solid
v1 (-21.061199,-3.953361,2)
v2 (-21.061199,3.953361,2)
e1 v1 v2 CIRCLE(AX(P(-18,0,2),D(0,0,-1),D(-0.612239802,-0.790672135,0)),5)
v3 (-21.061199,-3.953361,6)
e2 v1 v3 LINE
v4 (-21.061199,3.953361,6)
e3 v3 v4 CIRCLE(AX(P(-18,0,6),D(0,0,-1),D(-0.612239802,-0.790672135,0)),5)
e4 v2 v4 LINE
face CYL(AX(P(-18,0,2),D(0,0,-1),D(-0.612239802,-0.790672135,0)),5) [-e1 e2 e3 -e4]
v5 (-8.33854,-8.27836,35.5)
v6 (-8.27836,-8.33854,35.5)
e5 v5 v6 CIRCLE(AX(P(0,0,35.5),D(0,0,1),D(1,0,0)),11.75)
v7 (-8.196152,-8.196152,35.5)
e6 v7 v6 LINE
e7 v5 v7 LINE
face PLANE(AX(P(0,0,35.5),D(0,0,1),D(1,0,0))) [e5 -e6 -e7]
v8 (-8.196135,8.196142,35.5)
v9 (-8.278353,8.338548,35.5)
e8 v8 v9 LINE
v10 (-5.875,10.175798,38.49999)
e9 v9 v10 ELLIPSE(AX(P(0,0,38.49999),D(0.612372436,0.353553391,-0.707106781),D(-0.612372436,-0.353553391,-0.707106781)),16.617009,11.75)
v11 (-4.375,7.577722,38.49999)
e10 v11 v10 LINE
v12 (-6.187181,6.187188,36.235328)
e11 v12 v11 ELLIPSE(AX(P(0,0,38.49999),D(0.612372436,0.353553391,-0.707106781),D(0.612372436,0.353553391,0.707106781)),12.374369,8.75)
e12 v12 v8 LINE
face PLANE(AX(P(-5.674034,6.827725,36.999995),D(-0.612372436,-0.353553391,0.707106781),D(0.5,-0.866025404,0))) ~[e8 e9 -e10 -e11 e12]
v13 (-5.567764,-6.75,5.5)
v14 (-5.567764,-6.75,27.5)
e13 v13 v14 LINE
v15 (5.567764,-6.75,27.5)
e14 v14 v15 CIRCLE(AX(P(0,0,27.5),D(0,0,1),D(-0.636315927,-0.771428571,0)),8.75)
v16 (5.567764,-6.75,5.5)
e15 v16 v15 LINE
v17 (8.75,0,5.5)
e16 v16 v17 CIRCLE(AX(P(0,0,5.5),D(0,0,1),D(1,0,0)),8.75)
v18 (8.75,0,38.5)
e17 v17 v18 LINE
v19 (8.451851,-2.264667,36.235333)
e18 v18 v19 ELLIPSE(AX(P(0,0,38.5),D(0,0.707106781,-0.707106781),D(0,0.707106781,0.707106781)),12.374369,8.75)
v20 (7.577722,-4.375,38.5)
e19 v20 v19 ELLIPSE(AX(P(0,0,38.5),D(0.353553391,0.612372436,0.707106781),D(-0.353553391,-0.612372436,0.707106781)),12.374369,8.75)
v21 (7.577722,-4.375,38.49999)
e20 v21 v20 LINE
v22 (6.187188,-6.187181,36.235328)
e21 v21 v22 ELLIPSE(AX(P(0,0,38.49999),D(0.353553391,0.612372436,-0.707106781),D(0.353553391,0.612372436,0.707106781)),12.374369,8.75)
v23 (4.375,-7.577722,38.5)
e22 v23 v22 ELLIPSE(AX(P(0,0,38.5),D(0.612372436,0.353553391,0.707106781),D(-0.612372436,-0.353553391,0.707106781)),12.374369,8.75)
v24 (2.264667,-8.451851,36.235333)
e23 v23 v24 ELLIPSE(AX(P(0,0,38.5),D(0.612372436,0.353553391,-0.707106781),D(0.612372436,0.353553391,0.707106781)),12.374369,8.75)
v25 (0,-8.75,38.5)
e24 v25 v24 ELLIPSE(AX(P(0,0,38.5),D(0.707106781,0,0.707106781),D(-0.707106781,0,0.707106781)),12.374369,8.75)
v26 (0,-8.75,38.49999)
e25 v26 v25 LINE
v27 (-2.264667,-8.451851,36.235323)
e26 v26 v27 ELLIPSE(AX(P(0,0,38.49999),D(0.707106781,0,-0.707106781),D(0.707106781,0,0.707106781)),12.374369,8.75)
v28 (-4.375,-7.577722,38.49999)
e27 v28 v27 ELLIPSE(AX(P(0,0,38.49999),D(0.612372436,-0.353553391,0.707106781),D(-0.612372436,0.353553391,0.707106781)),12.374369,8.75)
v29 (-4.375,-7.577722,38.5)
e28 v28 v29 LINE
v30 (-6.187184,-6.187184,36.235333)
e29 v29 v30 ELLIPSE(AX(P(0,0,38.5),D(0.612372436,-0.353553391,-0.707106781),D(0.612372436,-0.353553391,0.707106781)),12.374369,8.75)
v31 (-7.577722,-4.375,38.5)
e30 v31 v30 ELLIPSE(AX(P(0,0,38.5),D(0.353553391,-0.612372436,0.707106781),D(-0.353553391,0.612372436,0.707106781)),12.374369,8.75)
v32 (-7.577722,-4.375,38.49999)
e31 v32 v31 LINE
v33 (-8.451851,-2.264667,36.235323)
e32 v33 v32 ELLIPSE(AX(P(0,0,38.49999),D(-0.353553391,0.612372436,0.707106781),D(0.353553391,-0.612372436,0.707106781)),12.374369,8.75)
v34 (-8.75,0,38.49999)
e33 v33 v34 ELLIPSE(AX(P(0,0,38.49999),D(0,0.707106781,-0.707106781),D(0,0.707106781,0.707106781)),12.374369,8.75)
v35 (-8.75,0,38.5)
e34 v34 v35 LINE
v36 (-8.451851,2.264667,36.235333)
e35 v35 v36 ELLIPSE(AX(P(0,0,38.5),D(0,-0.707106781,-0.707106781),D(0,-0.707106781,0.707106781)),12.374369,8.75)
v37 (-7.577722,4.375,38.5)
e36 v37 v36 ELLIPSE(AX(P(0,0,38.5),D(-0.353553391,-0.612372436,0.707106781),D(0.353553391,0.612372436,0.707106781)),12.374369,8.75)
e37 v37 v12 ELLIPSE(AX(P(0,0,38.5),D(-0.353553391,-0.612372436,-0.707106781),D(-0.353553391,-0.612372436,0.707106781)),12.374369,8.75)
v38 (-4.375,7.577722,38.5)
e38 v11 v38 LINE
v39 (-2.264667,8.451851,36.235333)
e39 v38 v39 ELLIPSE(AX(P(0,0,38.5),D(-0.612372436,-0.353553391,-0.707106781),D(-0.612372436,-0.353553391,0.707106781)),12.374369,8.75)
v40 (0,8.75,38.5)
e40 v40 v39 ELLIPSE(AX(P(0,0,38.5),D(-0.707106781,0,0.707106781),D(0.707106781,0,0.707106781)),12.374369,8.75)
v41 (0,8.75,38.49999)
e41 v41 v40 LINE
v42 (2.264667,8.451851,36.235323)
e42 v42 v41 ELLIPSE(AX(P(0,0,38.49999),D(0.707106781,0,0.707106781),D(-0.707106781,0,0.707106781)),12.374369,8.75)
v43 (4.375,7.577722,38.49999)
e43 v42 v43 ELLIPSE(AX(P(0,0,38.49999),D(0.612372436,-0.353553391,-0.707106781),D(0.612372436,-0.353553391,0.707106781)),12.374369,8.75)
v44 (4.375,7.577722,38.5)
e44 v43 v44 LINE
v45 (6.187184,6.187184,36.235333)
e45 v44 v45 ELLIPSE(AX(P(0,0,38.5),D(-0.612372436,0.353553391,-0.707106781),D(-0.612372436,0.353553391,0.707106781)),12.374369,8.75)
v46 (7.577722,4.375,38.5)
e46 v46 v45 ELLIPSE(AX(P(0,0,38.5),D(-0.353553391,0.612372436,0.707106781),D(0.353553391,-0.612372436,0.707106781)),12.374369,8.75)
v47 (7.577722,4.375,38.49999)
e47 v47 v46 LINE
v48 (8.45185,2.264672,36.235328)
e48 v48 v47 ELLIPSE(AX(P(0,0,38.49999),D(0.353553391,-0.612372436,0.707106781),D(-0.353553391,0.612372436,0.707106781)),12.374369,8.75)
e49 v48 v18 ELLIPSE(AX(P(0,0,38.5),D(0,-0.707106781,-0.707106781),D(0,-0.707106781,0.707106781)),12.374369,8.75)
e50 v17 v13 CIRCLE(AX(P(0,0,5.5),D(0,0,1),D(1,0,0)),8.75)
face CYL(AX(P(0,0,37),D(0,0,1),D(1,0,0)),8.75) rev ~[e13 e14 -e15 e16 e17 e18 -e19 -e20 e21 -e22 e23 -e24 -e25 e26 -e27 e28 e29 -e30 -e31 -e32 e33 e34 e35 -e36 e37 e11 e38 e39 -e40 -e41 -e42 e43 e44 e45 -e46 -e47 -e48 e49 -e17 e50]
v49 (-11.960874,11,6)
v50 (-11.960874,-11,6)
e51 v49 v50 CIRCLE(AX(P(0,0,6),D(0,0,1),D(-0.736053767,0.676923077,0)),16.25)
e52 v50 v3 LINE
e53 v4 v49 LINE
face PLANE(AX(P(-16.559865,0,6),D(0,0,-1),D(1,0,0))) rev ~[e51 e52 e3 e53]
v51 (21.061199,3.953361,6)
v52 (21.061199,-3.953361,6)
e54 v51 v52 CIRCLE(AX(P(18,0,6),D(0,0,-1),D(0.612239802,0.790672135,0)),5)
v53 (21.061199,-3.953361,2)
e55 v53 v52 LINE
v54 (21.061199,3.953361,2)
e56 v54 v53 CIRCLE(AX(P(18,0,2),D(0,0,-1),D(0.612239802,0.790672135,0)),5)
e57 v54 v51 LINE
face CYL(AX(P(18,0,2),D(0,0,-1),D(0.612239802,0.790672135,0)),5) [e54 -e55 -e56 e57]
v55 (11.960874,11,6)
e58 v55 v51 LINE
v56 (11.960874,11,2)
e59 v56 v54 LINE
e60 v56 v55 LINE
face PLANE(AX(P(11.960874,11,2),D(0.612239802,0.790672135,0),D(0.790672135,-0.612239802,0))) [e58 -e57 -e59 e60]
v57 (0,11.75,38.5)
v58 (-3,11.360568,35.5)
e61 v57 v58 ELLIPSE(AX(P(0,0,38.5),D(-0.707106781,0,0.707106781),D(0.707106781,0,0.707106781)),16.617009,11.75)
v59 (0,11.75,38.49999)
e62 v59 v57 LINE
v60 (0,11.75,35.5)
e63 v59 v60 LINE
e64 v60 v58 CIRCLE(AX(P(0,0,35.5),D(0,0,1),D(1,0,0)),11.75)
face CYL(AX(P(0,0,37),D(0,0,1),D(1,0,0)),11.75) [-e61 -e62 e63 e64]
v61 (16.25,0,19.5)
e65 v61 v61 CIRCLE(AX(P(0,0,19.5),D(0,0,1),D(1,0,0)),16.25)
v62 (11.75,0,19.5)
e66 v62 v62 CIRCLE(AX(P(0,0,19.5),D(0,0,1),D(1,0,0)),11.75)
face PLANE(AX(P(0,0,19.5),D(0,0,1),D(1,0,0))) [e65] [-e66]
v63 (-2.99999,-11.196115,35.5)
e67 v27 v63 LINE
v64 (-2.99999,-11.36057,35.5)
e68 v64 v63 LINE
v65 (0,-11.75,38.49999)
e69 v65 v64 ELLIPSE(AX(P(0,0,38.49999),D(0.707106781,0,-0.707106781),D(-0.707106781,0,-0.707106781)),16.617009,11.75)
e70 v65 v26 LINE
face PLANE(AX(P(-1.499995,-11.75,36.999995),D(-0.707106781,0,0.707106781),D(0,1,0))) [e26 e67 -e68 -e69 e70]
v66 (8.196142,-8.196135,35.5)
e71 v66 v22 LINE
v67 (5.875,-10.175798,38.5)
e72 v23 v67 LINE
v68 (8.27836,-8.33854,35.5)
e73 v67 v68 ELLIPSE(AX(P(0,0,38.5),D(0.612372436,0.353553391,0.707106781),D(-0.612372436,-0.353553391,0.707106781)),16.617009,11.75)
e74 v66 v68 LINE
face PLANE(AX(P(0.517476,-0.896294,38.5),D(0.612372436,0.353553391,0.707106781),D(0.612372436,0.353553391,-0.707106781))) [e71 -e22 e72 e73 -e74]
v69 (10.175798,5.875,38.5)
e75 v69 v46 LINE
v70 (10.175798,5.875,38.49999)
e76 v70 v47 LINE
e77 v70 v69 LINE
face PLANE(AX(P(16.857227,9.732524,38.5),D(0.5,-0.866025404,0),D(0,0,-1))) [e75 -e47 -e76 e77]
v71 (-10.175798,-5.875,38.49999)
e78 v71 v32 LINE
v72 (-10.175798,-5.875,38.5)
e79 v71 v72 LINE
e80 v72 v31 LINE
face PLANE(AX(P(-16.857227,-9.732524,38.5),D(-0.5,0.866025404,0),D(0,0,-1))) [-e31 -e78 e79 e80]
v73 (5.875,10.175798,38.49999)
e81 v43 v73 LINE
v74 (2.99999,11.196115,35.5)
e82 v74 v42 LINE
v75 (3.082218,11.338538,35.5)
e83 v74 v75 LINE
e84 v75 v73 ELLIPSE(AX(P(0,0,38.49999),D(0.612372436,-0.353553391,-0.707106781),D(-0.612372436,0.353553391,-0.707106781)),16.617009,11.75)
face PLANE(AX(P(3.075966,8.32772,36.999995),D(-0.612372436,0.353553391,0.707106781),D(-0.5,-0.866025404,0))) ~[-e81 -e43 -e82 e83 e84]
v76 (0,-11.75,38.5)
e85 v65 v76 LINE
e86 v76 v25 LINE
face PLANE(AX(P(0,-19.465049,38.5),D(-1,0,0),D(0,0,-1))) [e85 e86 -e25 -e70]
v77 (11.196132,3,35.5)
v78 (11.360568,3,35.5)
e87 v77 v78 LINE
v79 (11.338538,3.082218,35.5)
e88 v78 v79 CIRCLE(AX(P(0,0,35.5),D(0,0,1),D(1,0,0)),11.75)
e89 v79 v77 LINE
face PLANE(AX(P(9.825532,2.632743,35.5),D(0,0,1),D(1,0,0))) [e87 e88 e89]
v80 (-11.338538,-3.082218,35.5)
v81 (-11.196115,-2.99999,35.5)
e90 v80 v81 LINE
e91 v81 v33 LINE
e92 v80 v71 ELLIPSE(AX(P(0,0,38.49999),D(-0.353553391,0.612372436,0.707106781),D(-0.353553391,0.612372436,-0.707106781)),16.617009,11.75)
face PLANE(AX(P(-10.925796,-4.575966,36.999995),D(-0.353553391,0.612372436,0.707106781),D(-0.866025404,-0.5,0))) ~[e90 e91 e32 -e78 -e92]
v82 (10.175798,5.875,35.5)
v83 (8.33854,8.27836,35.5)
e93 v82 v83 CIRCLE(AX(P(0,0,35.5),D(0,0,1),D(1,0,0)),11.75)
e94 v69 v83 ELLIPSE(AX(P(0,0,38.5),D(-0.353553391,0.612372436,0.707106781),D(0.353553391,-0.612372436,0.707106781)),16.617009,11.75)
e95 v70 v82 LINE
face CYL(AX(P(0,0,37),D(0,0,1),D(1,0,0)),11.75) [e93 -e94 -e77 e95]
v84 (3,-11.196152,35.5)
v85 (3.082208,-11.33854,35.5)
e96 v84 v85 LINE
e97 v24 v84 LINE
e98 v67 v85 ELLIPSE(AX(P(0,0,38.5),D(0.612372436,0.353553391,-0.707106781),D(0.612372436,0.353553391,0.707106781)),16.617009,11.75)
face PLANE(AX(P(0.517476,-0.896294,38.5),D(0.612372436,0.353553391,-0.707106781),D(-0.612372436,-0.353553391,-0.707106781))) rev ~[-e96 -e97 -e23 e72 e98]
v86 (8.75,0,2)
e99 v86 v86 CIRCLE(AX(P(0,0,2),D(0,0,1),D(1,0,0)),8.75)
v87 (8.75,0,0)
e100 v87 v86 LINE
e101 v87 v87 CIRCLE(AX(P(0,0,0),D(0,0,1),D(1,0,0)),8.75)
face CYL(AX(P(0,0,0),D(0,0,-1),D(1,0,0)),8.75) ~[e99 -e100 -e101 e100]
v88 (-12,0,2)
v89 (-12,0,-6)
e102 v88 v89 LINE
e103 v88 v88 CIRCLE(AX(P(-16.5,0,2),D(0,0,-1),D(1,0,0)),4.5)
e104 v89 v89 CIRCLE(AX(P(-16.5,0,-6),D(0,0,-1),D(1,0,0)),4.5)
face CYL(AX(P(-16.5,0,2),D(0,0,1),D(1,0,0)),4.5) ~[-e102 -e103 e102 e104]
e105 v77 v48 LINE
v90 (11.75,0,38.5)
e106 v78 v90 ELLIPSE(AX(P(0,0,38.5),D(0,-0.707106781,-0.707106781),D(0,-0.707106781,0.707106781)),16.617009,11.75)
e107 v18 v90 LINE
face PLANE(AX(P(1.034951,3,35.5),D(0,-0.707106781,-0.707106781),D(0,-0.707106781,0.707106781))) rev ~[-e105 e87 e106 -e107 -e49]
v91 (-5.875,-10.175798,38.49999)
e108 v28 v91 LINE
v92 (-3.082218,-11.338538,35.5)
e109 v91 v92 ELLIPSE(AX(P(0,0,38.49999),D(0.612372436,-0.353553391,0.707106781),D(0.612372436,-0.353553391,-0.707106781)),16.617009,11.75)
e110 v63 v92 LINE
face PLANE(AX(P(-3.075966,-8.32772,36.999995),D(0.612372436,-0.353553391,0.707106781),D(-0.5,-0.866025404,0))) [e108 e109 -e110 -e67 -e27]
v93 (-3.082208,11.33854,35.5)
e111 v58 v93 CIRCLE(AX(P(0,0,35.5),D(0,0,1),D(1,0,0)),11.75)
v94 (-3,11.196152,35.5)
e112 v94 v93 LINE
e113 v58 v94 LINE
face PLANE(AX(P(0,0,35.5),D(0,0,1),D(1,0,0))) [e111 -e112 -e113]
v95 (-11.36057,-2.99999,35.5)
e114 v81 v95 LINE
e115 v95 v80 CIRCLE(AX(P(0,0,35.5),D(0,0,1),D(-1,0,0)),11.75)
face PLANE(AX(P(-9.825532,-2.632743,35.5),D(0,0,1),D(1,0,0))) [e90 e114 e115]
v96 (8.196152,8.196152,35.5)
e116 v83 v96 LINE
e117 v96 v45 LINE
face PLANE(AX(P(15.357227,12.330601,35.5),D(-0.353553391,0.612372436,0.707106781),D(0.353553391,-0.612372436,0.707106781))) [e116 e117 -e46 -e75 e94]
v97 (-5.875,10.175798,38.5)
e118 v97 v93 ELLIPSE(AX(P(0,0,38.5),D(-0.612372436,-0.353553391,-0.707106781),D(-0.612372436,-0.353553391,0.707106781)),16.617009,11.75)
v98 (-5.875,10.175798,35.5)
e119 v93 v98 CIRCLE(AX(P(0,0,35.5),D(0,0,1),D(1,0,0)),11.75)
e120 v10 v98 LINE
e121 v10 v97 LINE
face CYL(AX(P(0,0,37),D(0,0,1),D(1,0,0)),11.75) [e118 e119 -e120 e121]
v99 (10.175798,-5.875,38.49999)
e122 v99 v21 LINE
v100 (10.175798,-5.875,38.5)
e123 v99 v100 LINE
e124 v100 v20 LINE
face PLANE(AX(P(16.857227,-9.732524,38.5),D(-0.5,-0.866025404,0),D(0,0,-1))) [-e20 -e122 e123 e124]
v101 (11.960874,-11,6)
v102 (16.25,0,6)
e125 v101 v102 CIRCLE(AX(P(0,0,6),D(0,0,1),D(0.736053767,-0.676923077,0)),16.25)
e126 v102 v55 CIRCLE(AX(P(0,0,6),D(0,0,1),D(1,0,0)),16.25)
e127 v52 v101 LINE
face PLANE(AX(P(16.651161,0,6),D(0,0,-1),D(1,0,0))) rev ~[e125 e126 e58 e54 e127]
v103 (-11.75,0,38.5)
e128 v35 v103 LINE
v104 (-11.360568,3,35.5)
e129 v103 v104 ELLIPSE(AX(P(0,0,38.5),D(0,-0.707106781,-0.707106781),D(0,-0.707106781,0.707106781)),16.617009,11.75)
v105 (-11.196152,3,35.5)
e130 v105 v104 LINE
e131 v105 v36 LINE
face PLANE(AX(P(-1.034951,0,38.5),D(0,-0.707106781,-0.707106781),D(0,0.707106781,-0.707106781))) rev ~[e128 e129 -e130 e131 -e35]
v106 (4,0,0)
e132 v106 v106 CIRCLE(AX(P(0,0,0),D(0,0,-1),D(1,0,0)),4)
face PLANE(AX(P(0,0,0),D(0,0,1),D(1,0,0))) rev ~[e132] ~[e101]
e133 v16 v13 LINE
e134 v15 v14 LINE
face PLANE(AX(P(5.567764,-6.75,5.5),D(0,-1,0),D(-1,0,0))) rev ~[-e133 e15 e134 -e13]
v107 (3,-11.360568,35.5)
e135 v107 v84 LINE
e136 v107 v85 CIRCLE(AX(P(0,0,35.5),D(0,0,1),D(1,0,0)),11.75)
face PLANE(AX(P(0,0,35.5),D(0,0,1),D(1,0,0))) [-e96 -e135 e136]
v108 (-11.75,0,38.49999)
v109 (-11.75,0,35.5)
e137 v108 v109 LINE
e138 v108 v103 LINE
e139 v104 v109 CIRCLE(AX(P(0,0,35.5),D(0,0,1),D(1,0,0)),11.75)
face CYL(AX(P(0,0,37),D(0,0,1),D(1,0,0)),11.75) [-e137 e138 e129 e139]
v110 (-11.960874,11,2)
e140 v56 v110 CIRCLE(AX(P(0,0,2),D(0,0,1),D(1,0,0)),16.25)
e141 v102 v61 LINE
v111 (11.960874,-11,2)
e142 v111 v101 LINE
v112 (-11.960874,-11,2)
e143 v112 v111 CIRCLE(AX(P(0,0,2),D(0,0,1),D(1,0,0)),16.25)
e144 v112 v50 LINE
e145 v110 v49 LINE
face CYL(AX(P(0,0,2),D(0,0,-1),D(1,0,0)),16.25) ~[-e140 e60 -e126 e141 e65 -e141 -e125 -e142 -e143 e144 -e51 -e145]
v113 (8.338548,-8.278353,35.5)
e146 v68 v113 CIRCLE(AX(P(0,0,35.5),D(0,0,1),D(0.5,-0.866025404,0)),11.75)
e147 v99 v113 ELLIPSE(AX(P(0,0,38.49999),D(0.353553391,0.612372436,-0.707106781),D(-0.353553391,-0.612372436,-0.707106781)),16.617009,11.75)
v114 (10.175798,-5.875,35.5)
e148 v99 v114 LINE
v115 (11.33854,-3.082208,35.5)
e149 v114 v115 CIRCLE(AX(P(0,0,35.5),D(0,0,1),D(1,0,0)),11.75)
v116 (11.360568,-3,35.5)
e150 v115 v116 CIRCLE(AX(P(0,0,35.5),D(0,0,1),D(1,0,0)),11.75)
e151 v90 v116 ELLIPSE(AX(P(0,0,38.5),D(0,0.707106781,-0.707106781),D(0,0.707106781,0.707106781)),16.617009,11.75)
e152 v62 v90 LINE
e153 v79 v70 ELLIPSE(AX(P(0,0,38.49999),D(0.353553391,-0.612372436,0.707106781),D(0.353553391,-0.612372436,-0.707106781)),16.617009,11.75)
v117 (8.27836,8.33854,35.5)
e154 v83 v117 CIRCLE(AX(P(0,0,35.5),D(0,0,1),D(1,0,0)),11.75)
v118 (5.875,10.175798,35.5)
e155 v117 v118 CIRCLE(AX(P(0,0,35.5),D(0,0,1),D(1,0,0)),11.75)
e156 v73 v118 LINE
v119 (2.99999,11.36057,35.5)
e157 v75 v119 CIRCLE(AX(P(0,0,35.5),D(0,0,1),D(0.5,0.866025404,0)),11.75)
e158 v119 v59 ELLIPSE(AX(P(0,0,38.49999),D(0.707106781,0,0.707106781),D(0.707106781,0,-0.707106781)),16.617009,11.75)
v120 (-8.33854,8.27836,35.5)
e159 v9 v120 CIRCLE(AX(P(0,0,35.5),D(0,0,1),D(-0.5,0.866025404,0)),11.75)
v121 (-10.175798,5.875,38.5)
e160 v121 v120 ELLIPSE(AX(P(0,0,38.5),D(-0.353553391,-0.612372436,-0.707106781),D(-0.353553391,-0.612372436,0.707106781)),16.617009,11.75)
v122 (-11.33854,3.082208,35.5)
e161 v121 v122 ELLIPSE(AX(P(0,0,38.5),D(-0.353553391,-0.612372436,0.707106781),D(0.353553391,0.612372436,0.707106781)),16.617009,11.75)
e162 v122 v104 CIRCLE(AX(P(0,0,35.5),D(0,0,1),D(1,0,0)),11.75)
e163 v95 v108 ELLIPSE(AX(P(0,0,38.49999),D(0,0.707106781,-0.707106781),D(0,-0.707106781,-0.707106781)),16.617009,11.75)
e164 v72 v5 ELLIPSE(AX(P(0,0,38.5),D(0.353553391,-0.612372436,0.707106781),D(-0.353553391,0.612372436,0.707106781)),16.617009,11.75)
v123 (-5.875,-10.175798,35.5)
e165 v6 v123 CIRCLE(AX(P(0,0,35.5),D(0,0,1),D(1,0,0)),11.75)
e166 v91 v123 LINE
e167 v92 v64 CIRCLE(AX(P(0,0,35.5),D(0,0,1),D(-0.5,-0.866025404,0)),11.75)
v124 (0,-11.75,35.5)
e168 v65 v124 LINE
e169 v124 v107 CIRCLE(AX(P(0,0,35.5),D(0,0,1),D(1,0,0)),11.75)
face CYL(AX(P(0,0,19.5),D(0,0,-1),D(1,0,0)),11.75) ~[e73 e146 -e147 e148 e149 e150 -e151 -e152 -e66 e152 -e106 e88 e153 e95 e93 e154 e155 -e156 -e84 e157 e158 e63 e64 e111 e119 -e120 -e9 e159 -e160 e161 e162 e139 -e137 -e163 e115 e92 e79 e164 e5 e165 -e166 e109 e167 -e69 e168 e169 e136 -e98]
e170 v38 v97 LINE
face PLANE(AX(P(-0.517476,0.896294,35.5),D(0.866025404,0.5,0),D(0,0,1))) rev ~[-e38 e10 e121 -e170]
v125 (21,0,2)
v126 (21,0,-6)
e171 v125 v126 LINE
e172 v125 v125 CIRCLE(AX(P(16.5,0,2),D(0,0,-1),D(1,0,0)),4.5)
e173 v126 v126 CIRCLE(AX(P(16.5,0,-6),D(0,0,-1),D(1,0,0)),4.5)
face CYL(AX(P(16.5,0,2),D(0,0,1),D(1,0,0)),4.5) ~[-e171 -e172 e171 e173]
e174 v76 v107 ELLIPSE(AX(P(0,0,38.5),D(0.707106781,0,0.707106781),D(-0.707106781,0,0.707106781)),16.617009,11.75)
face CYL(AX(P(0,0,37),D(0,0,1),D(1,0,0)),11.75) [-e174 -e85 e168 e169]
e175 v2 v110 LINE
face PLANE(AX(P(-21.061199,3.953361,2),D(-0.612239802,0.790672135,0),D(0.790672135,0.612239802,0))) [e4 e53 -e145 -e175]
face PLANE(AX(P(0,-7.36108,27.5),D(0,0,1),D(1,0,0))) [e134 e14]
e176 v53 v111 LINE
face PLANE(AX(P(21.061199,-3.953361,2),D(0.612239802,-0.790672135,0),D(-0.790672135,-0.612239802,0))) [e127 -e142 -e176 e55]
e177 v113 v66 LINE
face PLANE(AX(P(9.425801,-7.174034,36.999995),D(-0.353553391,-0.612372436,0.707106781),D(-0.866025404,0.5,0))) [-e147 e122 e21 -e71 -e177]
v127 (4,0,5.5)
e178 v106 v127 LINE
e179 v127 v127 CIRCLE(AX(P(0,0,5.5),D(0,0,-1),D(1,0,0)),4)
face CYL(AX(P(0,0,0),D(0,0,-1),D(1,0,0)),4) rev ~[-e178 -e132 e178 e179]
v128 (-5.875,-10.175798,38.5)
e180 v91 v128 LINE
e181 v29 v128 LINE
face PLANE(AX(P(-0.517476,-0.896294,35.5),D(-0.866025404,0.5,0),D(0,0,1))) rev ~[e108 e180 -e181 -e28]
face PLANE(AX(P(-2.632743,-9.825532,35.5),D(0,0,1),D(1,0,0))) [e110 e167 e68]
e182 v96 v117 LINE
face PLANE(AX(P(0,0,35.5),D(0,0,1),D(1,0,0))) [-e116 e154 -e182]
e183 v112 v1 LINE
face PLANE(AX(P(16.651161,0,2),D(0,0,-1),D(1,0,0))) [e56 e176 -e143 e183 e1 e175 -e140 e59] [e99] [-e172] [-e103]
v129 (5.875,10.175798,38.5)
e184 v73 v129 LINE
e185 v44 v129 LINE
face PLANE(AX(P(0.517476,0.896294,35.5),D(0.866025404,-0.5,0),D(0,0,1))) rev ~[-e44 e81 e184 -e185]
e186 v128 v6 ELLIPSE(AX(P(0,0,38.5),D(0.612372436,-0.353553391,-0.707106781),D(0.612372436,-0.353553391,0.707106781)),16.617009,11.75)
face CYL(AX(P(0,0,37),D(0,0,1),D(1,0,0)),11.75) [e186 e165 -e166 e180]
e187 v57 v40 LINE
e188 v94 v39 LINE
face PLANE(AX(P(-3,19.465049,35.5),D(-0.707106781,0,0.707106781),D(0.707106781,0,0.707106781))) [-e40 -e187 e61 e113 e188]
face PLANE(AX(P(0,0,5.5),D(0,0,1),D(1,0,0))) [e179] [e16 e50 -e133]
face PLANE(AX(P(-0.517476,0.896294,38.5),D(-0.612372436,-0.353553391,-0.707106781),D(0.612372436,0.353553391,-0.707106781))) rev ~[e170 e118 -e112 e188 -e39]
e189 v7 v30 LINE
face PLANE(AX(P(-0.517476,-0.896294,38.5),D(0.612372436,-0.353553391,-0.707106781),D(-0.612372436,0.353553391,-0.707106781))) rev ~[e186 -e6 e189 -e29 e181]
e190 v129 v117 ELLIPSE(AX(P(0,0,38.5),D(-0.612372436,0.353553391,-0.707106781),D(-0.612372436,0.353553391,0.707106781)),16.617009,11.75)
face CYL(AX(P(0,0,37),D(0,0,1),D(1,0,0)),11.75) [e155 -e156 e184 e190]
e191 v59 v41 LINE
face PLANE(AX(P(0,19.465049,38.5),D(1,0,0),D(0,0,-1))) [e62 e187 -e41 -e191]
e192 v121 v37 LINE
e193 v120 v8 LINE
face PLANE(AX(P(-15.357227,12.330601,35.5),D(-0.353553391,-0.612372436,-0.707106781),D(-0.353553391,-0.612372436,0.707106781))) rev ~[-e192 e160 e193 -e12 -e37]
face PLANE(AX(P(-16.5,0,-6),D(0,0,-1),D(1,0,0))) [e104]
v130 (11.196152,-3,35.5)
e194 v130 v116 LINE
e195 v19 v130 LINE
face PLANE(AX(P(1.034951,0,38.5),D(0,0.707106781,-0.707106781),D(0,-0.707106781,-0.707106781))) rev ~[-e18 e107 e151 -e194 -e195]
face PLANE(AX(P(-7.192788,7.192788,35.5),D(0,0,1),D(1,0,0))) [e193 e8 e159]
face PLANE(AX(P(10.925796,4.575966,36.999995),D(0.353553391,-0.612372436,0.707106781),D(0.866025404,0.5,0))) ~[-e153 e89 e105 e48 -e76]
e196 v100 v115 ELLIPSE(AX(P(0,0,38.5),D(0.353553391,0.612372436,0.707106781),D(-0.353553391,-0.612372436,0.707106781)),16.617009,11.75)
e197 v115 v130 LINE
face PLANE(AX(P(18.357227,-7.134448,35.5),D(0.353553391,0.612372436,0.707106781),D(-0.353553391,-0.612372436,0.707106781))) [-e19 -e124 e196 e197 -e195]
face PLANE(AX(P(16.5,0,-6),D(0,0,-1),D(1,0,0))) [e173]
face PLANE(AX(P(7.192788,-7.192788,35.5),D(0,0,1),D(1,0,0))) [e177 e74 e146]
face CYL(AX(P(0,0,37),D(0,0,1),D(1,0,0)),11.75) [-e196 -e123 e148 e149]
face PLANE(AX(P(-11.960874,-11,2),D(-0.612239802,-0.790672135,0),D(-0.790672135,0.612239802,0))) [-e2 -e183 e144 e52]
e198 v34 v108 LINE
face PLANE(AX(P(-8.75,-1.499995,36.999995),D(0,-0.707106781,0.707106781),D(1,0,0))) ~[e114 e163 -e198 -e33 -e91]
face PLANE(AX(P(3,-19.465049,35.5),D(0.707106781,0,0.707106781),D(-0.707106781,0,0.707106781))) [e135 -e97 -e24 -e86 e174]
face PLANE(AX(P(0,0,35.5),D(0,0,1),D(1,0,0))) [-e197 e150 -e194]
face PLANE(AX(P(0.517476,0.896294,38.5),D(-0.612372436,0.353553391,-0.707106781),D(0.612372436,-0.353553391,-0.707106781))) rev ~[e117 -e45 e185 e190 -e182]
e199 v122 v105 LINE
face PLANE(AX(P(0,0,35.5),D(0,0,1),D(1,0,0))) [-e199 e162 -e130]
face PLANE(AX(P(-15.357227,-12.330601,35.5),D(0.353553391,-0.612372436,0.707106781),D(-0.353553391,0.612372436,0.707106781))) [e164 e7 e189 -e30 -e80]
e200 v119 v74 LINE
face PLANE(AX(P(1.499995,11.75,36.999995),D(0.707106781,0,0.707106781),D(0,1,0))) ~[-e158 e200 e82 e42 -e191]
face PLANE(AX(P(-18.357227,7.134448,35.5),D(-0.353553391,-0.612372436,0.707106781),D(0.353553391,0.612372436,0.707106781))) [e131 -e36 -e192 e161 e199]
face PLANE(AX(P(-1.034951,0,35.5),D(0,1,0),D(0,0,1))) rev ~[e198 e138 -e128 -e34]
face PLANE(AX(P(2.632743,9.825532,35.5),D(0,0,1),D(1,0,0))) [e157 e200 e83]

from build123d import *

# Parameters (mm, degrees)
F0_R          = 8.75
F1_DEPTH      = 2
F2_R          = 16.25
F3_DEPTH      = 17.5
F4_R          = 11.75
F5_DEPTH      = 19
F6_R          = 8.75
F7_DEPTH      = 33
F8_R          = 4
F9_DEPTH      = 5.5
F11_DEPTH     = 4
F12_R         = 4.5
F13_DEPTH     = 8
F15_DEPTH     = 22
F17_DEPTH     = 3
F18_SIZE      = 2.99999
F19_SIZE      = 2.99999
F20_DEPTH     = 3
F21_SIZE      = 2.99999
F22_T4_DEPTH  = 18.4300979278
F22_S5_R      = 11.75
F22_T6_DEPTH  = 11
F22_S7_R      = 8.75
F22_T8_DEPTH  = 11
F22_T13_DEPTH = 18.4300979278
F22_S14_R     = 11.75
F22_T15_DEPTH = 12
F22_S17_R     = 8.75
F22_T18_DEPTH = 12
F22_T22_DEPTH = 18.4300979278
F22_S23_R     = 11.75
F22_T24_DEPTH = 12
F22_S25_R     = 8.75
F22_T26_DEPTH = 12
F23_SIZE      = 2.99999
F24_SIZE      = 2.99999
F25_DEPTH     = 3
F26_T4_DEPTH  = 18.4300979278
F26_S5_R      = 11.75
F26_T6_DEPTH  = 12
F26_S7_R      = 8.75
F26_T8_DEPTH  = 12
F26_T12_DEPTH = 18.4300979278
F26_S13_R     = 11.75
F26_T14_DEPTH = 12
F26_S15_R     = 8.75
F26_T16_DEPTH = 12
F26_T20_DEPTH = 18.4300979278
F26_S21_R     = 11.75
F26_T22_DEPTH = 12
F26_S23_R     = 8.75
F26_T24_DEPTH = 12
F26_T28_DEPTH = 18.4300979278
F26_S29_R     = 11.75
F26_T30_DEPTH = 11
F26_S31_R     = 8.75
F26_T32_DEPTH = 11
F26_T36_DEPTH = 18.4300979278
F26_S37_R     = 11.75
F26_T38_DEPTH = 11
F26_S39_R     = 8.75
F26_T40_DEPTH = 11
F26_T44_DEPTH = 18.4300979278
F26_S45_R     = 11.75
F26_T46_DEPTH = 12
F26_S47_R     = 8.75
F26_T48_DEPTH = 12
F26_T52_DEPTH = 18.4300979278
F26_S53_R     = 11.75
F26_T54_DEPTH = 12
F26_S55_R     = 8.75
F26_T56_DEPTH = 12
F26_T60_DEPTH = 18.4300979278
F26_S61_R     = 11.75
F26_T62_DEPTH = 11
F26_S63_R     = 8.75
F26_T64_DEPTH = 11
F26_T68_DEPTH = 18.4300979278
F26_S69_R     = 11.75
F26_T70_DEPTH = 12
F26_S71_R     = 8.75
F26_T72_DEPTH = 12
F26_T76_DEPTH = 18.4300979278
F26_S77_R     = 11.75
F26_T78_DEPTH = 11
F26_S79_R     = 8.75
F26_T80_DEPTH = 11
F26_T84_DEPTH = 18.4300979278
F26_S85_R     = 11.75
F26_T86_DEPTH = 12
F26_S87_R     = 8.75
F26_T88_DEPTH = 12
F26_T92_DEPTH = 18.4300979278
F26_S93_R     = 11.75
F26_T94_DEPTH = 12
F26_S95_R     = 8.75
F26_T96_DEPTH = 12


# Not quite as in the source:
# - a fillet or chamfer that OpenCascade refuses, or shapes differently, is made with other operations: its cross-section is extruded or revolved along the edge and cut away or added
# - a fillet or chamfer is up to 0.001 mm smaller than in the source, because OpenCascade refuses the exact size


with BuildPart() as f1:
    # F0 (on Top) → F1 (new body)
    with BuildSketch(Plane.XY):
        Circle(F0_R)
    extrude(amount=F1_DEPTH)

    # F2 (on face) → F3 (join)
    with BuildSketch(Plane.XY.offset(2)):
        Circle(F2_R)
    extrude(amount=F3_DEPTH)

    # F4 (on face) → F5 (join)
    with BuildSketch(Plane.XY.offset(19.5)):
        Circle(F4_R)
    extrude(amount=F5_DEPTH)

    # F6 (on face) → F7 (cut)
    with BuildSketch(Plane.XY.offset(38.5)):
        Circle(F6_R)
    extrude(amount=-F7_DEPTH, mode=Mode.SUBTRACT)

    # F8 (on face) → F9 (cut, through all)
    with BuildSketch(Plane(origin=(0, 0, 0), x_dir=(1, 0, 0), z_dir=(0, 0, -1))):
        Circle(F8_R)
    extrude(amount=-F9_DEPTH, mode=Mode.SUBTRACT)

    # F10 (on face) → F11 (join)
    with BuildSketch(Plane(origin=(0, 0, 2), x_dir=(1, 0, 0), z_dir=(0, 0, -1))):
        with BuildLine():
            ThreePointArc((-11.9608737139, -11), (-16.25, 0), (-11.9608737139, 11))
            Line((-11.9608737139, 11), (-21.0611990106, 3.9533606738))
            ThreePointArc((-21.0611990106, 3.9533606738), (-23, 0), (-21.0611990106, -3.9533606738))
            Line((-21.0611990106, -3.9533606738), (-11.9608737139, -11))
        make_face()
        with BuildLine():
            Line((21.0611990106, 3.9533606738), (11.9608737139, 11))
            ThreePointArc((11.9608737139, 11), (15.1397935562, 5.9033169553), (16.25, 0))
            ThreePointArc((16.25, 0), (15.1397935562, -5.9033169553), (11.9608737139, -11))
            Line((11.9608737139, -11), (21.0611990106, -3.9533606738))
            ThreePointArc((21.0611990106, -3.9533606738), (23, 0), (21.0611990106, 3.9533606738))
        make_face()
    extrude(amount=-F11_DEPTH)

    # F12 (on face) → F13 (join)
    with BuildSketch(Plane(origin=(0, 0, 2), x_dir=(1, 0, 0), z_dir=(0, 0, -1))):
        with Locations((-16.5, 0)):
            Circle(F12_R)
        with Locations((16.5, 0)):
            Circle(F12_R)
    extrude(amount=F13_DEPTH)

    # F14 (on face) → F15 (join)
    with BuildSketch(Plane.XY.offset(5.5)):
        with BuildLine():
            Line((5.5677643628, -6.75), (-5.5677643628, -6.75))
            ThreePointArc((-5.5677643628, -6.75), (0, -8.75), (5.5677643628, -6.75))
        make_face()
    extrude(amount=F15_DEPTH)

    # F16 (on face) → F17 (cut)
    with BuildSketch(Plane.XY.offset(38.5)):
        with BuildLine():
            ThreePointArc((-7.5777222831, -4.375), (-8.45185098, -2.2646666446), (-8.75, 0))
            Line((-8.75, 0), (-11.75, 0))
            ThreePointArc((-11.75, 0), (-11.3496284589, -3.04112378), (-10.1757984945, -5.875))
            Line((-10.1757984945, -5.875), (-7.5777222831, -4.375))
        make_face()
    extrude(amount=-F17_DEPTH, mode=Mode.SUBTRACT)

    # F18 (size 3 in the source; OpenCascade refuses exactly that, so slightly less here)
    f18_edges = [f1.edges().sort_by_distance(p)[0] for p in [
        (-10.25, 0, 35.5),
    ]]
    chamfer(f18_edges, length=F18_SIZE)

    # F19 (size 3 in the source; OpenCascade refuses exactly that, so slightly less here)
    f19_edges = [f1.edges().sort_by_distance(p)[0] for p in [
        (-8.87676, -5.125, 35.5),
    ]]
    chamfer(f19_edges, length=F19_SIZE)

    # F16 (on face) → F20 (cut)
    with BuildSketch(Plane.XY.offset(38.5)):
        with BuildLine():
            Line((-10.1757984945, 5.875), (-7.5777222831, 4.375))
            ThreePointArc((-7.5777222831, 4.375), (-6.1871843354, 6.1871843354), (-4.375, 7.5777222831))
            Line((-4.375, 7.5777222831), (-5.875, 10.1757984945))
            ThreePointArc((-5.875, 10.1757984945), (-8.3085046789, 8.3085046789), (-10.1757984945, 5.875))
        make_face()
        with BuildLine():
            Line((0, 11.75), (0, 8.75))
            ThreePointArc((0, 8.75), (2.2646666446, 8.45185098), (4.375, 7.5777222831))
            Line((4.375, 7.5777222831), (5.875, 10.1757984945))
            ThreePointArc((5.875, 10.1757984945), (3.04112378, 11.3496284589), (0, 11.75))
        make_face()
        with BuildLine():
            Line((10.1757984945, 5.875), (7.5777222831, 4.375))
            ThreePointArc((7.5777222831, 4.375), (8.45185098, 2.2646666446), (8.75, 0))
            Line((8.75, 0), (11.75, 0))
            ThreePointArc((11.75, 0), (11.3496284589, 3.04112378), (10.1757984945, 5.875))
        make_face()
        with BuildLine():
            ThreePointArc((7.5777222831, -4.375), (6.1871843354, -6.1871843354), (4.375, -7.5777222831))
            Line((4.375, -7.5777222831), (5.875, -10.1757984945))
            ThreePointArc((5.875, -10.1757984945), (8.3085046789, -8.3085046789), (10.1757984945, -5.875))
            Line((10.1757984945, -5.875), (7.5777222831, -4.375))
        make_face()
        with BuildLine():
            ThreePointArc((0, -8.75), (-2.2646666446, -8.45185098), (-4.375, -7.5777222831))
            Line((-4.375, -7.5777222831), (-5.875, -10.1757984945))
            ThreePointArc((-5.875, -10.1757984945), (-3.04112378, -11.3496284589), (0, -11.75))
            Line((0, -11.75), (0, -8.75))
        make_face()
    extrude(amount=-F20_DEPTH, mode=Mode.SUBTRACT)

    # F21 (size 3 in the source; OpenCascade refuses exactly that, so slightly less here)
    f21_edges = [f1.edges().sort_by_distance(p)[0] for p in [
        (5.125, 8.87676, 35.5),
        (8.87676, -5.125, 35.5),
        (0, -10.25, 35.5),
        (-5.125, 8.87676, 35.5),
    ]]
    chamfer(f21_edges, length=F21_SIZE)

    # F22: chamfer of 3 on 3 edges, made by hand


with BuildPart() as f22_tool2:
    # F22_s3 → F22_t4 (new body)
    with BuildSketch(Plane.YZ.offset(1.0349510361)):
        Polygon((3, 35.5), (0, 38.5), (0, 35.5), align=None)
    extrude(amount=F22_T4_DEPTH)

    # F22_s5 → F22_t6 (intersect, symmetric)
    with BuildSketch(Plane.XY.offset(37)):
        Circle(F22_S5_R)
    extrude(amount=F22_T6_DEPTH, both=True, mode=Mode.INTERSECT)

    # F22_s7 → F22_t8 (cut, symmetric)
    with BuildSketch(Plane.XY.offset(37)):
        Circle(F22_S7_R)
    extrude(amount=F22_T8_DEPTH, both=True, mode=Mode.SUBTRACT)

    split(bisect_by=Plane.XY.offset(38.5), keep=Keep.BOTTOM)


with BuildPart() as f1_1:
    add(f1.part)

    # F22_t1: union F22_tool2
    add(f22_tool2.part)


with BuildPart() as f22_tool11:
    # F22_s12 → F22_t13 (new body)
    with BuildSketch(Plane(origin=(0.5174755181, -0.8962938889, 0), x_dir=(0, 0, 1), z_dir=(0.5, -0.8660254038, 0))):
        Polygon((38.5, 0), (35.5, -3), (35.5, 0), align=None)
    extrude(amount=F22_T13_DEPTH)

    # F22_s14 → F22_t15 (intersect, symmetric)
    with BuildSketch(Plane.XY.offset(37)):
        Circle(F22_S14_R)
    extrude(amount=F22_T15_DEPTH, both=True, mode=Mode.INTERSECT)

    split(bisect_by=Plane.XY.offset(38.5), keep=Keep.BOTTOM)

    # F22_s17 → F22_t18 (cut, symmetric)
    with BuildSketch(Plane.XY.offset(37)):
        Circle(F22_S17_R)
    extrude(amount=F22_T18_DEPTH, both=True, mode=Mode.SUBTRACT)


with BuildPart() as f1_2:
    add(f1_1.part)

    # F22_t10: union F22_tool11
    add(f22_tool11.part)


with BuildPart() as f22_tool20:
    # F22_s21 → F22_t22 (new body)
    with BuildSketch(Plane(origin=(-16.8572268886, 9.7325244819, 0), x_dir=(0, 0, 1), z_dir=(0.8660254038, -0.5, 0))):
        Polygon((35.5, -3), (38.5, 0), (35.5, 0), align=None)
    extrude(amount=F22_T22_DEPTH)

    # F22_s23 → F22_t24 (intersect, symmetric)
    with BuildSketch(Plane.XY.offset(37)):
        Circle(F22_S23_R)
    extrude(amount=F22_T24_DEPTH, both=True, mode=Mode.INTERSECT)

    # F22_s25 → F22_t26 (cut, symmetric)
    with BuildSketch(Plane.XY.offset(37)):
        Circle(F22_S25_R)
    extrude(amount=F22_T26_DEPTH, both=True, mode=Mode.SUBTRACT)

    split(bisect_by=Plane.XY.offset(38.5), keep=Keep.BOTTOM)


with BuildPart() as f1_3:
    add(f1_2.part)

    # F22_t19: union F22_tool20
    add(f22_tool20.part)

    # F23 (size 3 in the source; OpenCascade refuses exactly that, so slightly less here)
    f23_edges = [f1_3.edges().sort_by_distance(p)[0] for p in [
        (0, 10.25, 35.5),
        (8.87676, 5.125, 35.5),
    ]]
    chamfer(f23_edges, length=F23_SIZE)

    # F24 (size 3 in the source; OpenCascade refuses exactly that, so slightly less here)
    f24_edges = [f1_3.edges().sort_by_distance(p)[0] for p in [
        (-5.125, -8.87676, 35.5),
    ]]
    chamfer(f24_edges, length=F24_SIZE)

    # F25 (cut): faces of the model
    f25_faces = [f1_3.faces().sort_by_distance(p)[0] for p in [
        (-7.2164850483, -7.2164850483, 38.5),
        (2.6414168537, -9.857901902, 38.5),
        (9.857901902, -2.6414168537, 38.5),
        (7.2164850483, 7.2164850483, 38.5),
        (-2.6414168537, 9.857901902, 38.5),
        (-9.857901902, 2.6414168537, 38.5),
    ]]
    extrude(f25_faces, amount=-F25_DEPTH, mode=Mode.SUBTRACT)

    # F26: chamfer of 3 on 12 edges, made by hand


with BuildPart() as f26_tool2:
    # F26_s3 → F26_t4 (new body)
    with BuildSketch(Plane(origin=(-16.8572268886, 9.7325244819, 0), x_dir=(0, 0, 1), z_dir=(0.8660254038, -0.5, 0))):
        Polygon((35.5, 3), (38.5, 0), (35.5, 0), align=None)
    extrude(amount=F26_T4_DEPTH)

    # F26_s5 → F26_t6 (intersect, symmetric)
    with BuildSketch(Plane.XY.offset(37)):
        Circle(F26_S5_R)
    extrude(amount=F26_T6_DEPTH, both=True, mode=Mode.INTERSECT)

    # F26_s7 → F26_t8 (cut, symmetric)
    with BuildSketch(Plane.XY.offset(37)):
        Circle(F26_S7_R)
    extrude(amount=F26_T8_DEPTH, both=True, mode=Mode.SUBTRACT)


with BuildPart() as f1_4:
    add(f1_3.part)

    # F26_t1: union F26_tool2
    add(f26_tool2.part)


with BuildPart() as f26_tool10:
    # F26_s11 → F26_t12 (new body)
    with BuildSketch(Plane(origin=(-16.8572268886, -9.7325244819, 0), x_dir=(0, 0, 1), z_dir=(0.8660254038, 0.5, 0))):
        Polygon((35.5, 3), (38.5, 0), (35.5, 0), align=None)
    extrude(amount=F26_T12_DEPTH)

    # F26_s13 → F26_t14 (intersect, symmetric)
    with BuildSketch(Plane.XY.offset(37)):
        Circle(F26_S13_R)
    extrude(amount=F26_T14_DEPTH, both=True, mode=Mode.INTERSECT)

    # F26_s15 → F26_t16 (cut, symmetric)
    with BuildSketch(Plane.XY.offset(37)):
        Circle(F26_S15_R)
    extrude(amount=F26_T16_DEPTH, both=True, mode=Mode.SUBTRACT)


with BuildPart() as f1_5:
    add(f1_4.part)

    # F26_t9: union F26_tool10
    add(f26_tool10.part)


with BuildPart() as f26_tool18:
    # F26_s19 → F26_t20 (new body)
    with BuildSketch(Plane(origin=(0.5174755181, -0.8962938889, 0), x_dir=(0, 0, 1), z_dir=(0.5, -0.8660254038, 0))):
        Polygon((38.5, 0), (35.5, 3), (35.5, 0), align=None)
    extrude(amount=F26_T20_DEPTH)

    # F26_s21 → F26_t22 (intersect, symmetric)
    with BuildSketch(Plane.XY.offset(37)):
        Circle(F26_S21_R)
    extrude(amount=F26_T22_DEPTH, both=True, mode=Mode.INTERSECT)

    # F26_s23 → F26_t24 (cut, symmetric)
    with BuildSketch(Plane.XY.offset(37)):
        Circle(F26_S23_R)
    extrude(amount=F26_T24_DEPTH, both=True, mode=Mode.SUBTRACT)


with BuildPart() as f1_6:
    add(f1_5.part)

    # F26_t17: union F26_tool18
    add(f26_tool18.part)


with BuildPart() as f26_tool26:
    # F26_s27 → F26_t28 (new body)
    with BuildSketch(Plane.YZ.offset(1.0349510361)):
        Polygon((0, 38.5), (-3, 35.5), (0, 35.5), align=None)
    extrude(amount=F26_T28_DEPTH)

    # F26_s29 → F26_t30 (intersect, symmetric)
    with BuildSketch(Plane.XY.offset(37)):
        Circle(F26_S29_R)
    extrude(amount=F26_T30_DEPTH, both=True, mode=Mode.INTERSECT)

    # F26_s31 → F26_t32 (cut, symmetric)
    with BuildSketch(Plane.XY.offset(37)):
        Circle(F26_S31_R)
    extrude(amount=F26_T32_DEPTH, both=True, mode=Mode.SUBTRACT)


with BuildPart() as f1_7:
    add(f1_6.part)

    # F26_t25: union F26_tool26
    add(f26_tool26.part)


with BuildPart() as f26_tool34:
    # F26_s35 → F26_t36 (new body)
    with BuildSketch(Plane.XZ.offset(-19.4650489639)):
        Polygon((-3, 35.5), (0, 38.5), (0, 35.5), align=None)
    extrude(amount=F26_T36_DEPTH)

    # F26_s37 → F26_t38 (intersect, symmetric)
    with BuildSketch(Plane.XY.offset(37)):
        Circle(F26_S37_R)
    extrude(amount=F26_T38_DEPTH, both=True, mode=Mode.INTERSECT)

    # F26_s39 → F26_t40 (cut, symmetric)
    with BuildSketch(Plane.XY.offset(37)):
        Circle(F26_S39_R)
    extrude(amount=F26_T40_DEPTH, both=True, mode=Mode.SUBTRACT)


with BuildPart() as f1_8:
    add(f1_7.part)

    # F26_t33: union F26_tool34
    add(f26_tool34.part)


with BuildPart() as f26_tool42:
    # F26_s43 → F26_t44 (new body)
    with BuildSketch(Plane(origin=(16.8572268886, 9.7325244819, 0), x_dir=(0, 0, 1), z_dir=(-0.8660254038, -0.5, 0))):
        Polygon((35.5, 3), (38.5, 0), (35.5, 0), align=None)
    extrude(amount=F26_T44_DEPTH)

    # F26_s45 → F26_t46 (intersect, symmetric)
    with BuildSketch(Plane.XY.offset(37)):
        Circle(F26_S45_R)
    extrude(amount=F26_T46_DEPTH, both=True, mode=Mode.INTERSECT)

    # F26_s47 → F26_t48 (cut, symmetric)
    with BuildSketch(Plane.XY.offset(37)):
        Circle(F26_S47_R)
    extrude(amount=F26_T48_DEPTH, both=True, mode=Mode.SUBTRACT)


with BuildPart() as f1_9:
    add(f1_8.part)

    # F26_t41: union F26_tool42
    add(f26_tool42.part)


with BuildPart() as f26_tool50:
    # F26_s51 → F26_t52 (new body)
    with BuildSketch(Plane(origin=(-0.5174755181, -0.8962938889, 0), x_dir=(0, 0, 1), z_dir=(-0.5, -0.8660254038, 0))):
        Polygon((38.5, 0), (35.5, 3), (35.5, 0), align=None)
    extrude(amount=F26_T52_DEPTH)

    # F26_s53 → F26_t54 (intersect, symmetric)
    with BuildSketch(Plane.XY.offset(37)):
        Circle(F26_S53_R)
    extrude(amount=F26_T54_DEPTH, both=True, mode=Mode.INTERSECT)

    # F26_s55 → F26_t56 (cut, symmetric)
    with BuildSketch(Plane.XY.offset(37)):
        Circle(F26_S55_R)
    extrude(amount=F26_T56_DEPTH, both=True, mode=Mode.SUBTRACT)


with BuildPart() as f1_10:
    add(f1_9.part)

    # F26_t49: union F26_tool50
    add(f26_tool50.part)


with BuildPart() as f26_tool58:
    # F26_s59 → F26_t60 (new body)
    with BuildSketch(Plane.YZ.offset(-1.0349510361)):
        Polygon((0, 38.5), (3, 35.5), (0, 35.5), align=None)
    extrude(amount=-F26_T60_DEPTH)

    # F26_s61 → F26_t62 (intersect, symmetric)
    with BuildSketch(Plane.XY.offset(37)):
        Circle(F26_S61_R)
    extrude(amount=F26_T62_DEPTH, both=True, mode=Mode.INTERSECT)

    # F26_s63 → F26_t64 (cut, symmetric)
    with BuildSketch(Plane.XY.offset(37)):
        Circle(F26_S63_R)
    extrude(amount=F26_T64_DEPTH, both=True, mode=Mode.SUBTRACT)


with BuildPart() as f1_11:
    add(f1_10.part)

    # F26_t57: union F26_tool58
    add(f26_tool58.part)


with BuildPart() as f26_tool66:
    # F26_s67 → F26_t68 (new body)
    with BuildSketch(Plane(origin=(16.8572268886, -9.7325244819, 0), x_dir=(0, 0, 1), z_dir=(-0.8660254038, 0.5, 0))):
        Polygon((35.5, 3), (38.5, 0), (35.5, 0), align=None)
    extrude(amount=F26_T68_DEPTH)

    # F26_s69 → F26_t70 (intersect, symmetric)
    with BuildSketch(Plane.XY.offset(37)):
        Circle(F26_S69_R)
    extrude(amount=F26_T70_DEPTH, both=True, mode=Mode.INTERSECT)

    # F26_s71 → F26_t72 (cut, symmetric)
    with BuildSketch(Plane.XY.offset(37)):
        Circle(F26_S71_R)
    extrude(amount=F26_T72_DEPTH, both=True, mode=Mode.SUBTRACT)


with BuildPart() as f1_12:
    add(f1_11.part)

    # F26_t65: union F26_tool66
    add(f26_tool66.part)


with BuildPart() as f26_tool74:
    # F26_s75 → F26_t76 (new body)
    with BuildSketch(Plane.XZ.offset(19.4650489639)):
        Polygon((3, 35.5), (0, 38.5), (0, 35.5), align=None)
    extrude(amount=-F26_T76_DEPTH)

    # F26_s77 → F26_t78 (intersect, symmetric)
    with BuildSketch(Plane.XY.offset(37)):
        Circle(F26_S77_R)
    extrude(amount=F26_T78_DEPTH, both=True, mode=Mode.INTERSECT)

    # F26_s79 → F26_t80 (cut, symmetric)
    with BuildSketch(Plane.XY.offset(37)):
        Circle(F26_S79_R)
    extrude(amount=F26_T80_DEPTH, both=True, mode=Mode.SUBTRACT)


with BuildPart() as f1_13:
    add(f1_12.part)

    # F26_t73: union F26_tool74
    add(f26_tool74.part)


with BuildPart() as f26_tool82:
    # F26_s83 → F26_t84 (new body)
    with BuildSketch(Plane(origin=(-0.5174755181, 0.8962938889, 0), x_dir=(0, 0, 1), z_dir=(-0.5, 0.8660254038, 0))):
        Polygon((38.5, 0), (35.5, 3), (35.5, 0), align=None)
    extrude(amount=F26_T84_DEPTH)

    # F26_s85 → F26_t86 (intersect, symmetric)
    with BuildSketch(Plane.XY.offset(37)):
        Circle(F26_S85_R)
    extrude(amount=F26_T86_DEPTH, both=True, mode=Mode.INTERSECT)

    # F26_s87 → F26_t88 (cut, symmetric)
    with BuildSketch(Plane.XY.offset(37)):
        Circle(F26_S87_R)
    extrude(amount=F26_T88_DEPTH, both=True, mode=Mode.SUBTRACT)


with BuildPart() as f1_14:
    add(f1_13.part)

    # F26_t81: union F26_tool82
    add(f26_tool82.part)


with BuildPart() as f26_tool90:
    # F26_s91 → F26_t92 (new body)
    with BuildSketch(Plane(origin=(0.5174755181, 0.8962938889, 0), x_dir=(0, 0, 1), z_dir=(0.5, 0.8660254038, 0))):
        Polygon((38.5, 0), (35.5, 3), (35.5, 0), align=None)
    extrude(amount=F26_T92_DEPTH)

    # F26_s93 → F26_t94 (intersect, symmetric)
    with BuildSketch(Plane.XY.offset(37)):
        Circle(F26_S93_R)
    extrude(amount=F26_T94_DEPTH, both=True, mode=Mode.INTERSECT)

    # F26_s95 → F26_t96 (cut, symmetric)
    with BuildSketch(Plane.XY.offset(37)):
        Circle(F26_S95_R)
    extrude(amount=F26_T96_DEPTH, both=True, mode=Mode.SUBTRACT)


with BuildPart() as f1_15:
    add(f1_14.part)

    # F26_t89: union F26_tool90
    add(f26_tool90.part)


solid = f1_15.part
